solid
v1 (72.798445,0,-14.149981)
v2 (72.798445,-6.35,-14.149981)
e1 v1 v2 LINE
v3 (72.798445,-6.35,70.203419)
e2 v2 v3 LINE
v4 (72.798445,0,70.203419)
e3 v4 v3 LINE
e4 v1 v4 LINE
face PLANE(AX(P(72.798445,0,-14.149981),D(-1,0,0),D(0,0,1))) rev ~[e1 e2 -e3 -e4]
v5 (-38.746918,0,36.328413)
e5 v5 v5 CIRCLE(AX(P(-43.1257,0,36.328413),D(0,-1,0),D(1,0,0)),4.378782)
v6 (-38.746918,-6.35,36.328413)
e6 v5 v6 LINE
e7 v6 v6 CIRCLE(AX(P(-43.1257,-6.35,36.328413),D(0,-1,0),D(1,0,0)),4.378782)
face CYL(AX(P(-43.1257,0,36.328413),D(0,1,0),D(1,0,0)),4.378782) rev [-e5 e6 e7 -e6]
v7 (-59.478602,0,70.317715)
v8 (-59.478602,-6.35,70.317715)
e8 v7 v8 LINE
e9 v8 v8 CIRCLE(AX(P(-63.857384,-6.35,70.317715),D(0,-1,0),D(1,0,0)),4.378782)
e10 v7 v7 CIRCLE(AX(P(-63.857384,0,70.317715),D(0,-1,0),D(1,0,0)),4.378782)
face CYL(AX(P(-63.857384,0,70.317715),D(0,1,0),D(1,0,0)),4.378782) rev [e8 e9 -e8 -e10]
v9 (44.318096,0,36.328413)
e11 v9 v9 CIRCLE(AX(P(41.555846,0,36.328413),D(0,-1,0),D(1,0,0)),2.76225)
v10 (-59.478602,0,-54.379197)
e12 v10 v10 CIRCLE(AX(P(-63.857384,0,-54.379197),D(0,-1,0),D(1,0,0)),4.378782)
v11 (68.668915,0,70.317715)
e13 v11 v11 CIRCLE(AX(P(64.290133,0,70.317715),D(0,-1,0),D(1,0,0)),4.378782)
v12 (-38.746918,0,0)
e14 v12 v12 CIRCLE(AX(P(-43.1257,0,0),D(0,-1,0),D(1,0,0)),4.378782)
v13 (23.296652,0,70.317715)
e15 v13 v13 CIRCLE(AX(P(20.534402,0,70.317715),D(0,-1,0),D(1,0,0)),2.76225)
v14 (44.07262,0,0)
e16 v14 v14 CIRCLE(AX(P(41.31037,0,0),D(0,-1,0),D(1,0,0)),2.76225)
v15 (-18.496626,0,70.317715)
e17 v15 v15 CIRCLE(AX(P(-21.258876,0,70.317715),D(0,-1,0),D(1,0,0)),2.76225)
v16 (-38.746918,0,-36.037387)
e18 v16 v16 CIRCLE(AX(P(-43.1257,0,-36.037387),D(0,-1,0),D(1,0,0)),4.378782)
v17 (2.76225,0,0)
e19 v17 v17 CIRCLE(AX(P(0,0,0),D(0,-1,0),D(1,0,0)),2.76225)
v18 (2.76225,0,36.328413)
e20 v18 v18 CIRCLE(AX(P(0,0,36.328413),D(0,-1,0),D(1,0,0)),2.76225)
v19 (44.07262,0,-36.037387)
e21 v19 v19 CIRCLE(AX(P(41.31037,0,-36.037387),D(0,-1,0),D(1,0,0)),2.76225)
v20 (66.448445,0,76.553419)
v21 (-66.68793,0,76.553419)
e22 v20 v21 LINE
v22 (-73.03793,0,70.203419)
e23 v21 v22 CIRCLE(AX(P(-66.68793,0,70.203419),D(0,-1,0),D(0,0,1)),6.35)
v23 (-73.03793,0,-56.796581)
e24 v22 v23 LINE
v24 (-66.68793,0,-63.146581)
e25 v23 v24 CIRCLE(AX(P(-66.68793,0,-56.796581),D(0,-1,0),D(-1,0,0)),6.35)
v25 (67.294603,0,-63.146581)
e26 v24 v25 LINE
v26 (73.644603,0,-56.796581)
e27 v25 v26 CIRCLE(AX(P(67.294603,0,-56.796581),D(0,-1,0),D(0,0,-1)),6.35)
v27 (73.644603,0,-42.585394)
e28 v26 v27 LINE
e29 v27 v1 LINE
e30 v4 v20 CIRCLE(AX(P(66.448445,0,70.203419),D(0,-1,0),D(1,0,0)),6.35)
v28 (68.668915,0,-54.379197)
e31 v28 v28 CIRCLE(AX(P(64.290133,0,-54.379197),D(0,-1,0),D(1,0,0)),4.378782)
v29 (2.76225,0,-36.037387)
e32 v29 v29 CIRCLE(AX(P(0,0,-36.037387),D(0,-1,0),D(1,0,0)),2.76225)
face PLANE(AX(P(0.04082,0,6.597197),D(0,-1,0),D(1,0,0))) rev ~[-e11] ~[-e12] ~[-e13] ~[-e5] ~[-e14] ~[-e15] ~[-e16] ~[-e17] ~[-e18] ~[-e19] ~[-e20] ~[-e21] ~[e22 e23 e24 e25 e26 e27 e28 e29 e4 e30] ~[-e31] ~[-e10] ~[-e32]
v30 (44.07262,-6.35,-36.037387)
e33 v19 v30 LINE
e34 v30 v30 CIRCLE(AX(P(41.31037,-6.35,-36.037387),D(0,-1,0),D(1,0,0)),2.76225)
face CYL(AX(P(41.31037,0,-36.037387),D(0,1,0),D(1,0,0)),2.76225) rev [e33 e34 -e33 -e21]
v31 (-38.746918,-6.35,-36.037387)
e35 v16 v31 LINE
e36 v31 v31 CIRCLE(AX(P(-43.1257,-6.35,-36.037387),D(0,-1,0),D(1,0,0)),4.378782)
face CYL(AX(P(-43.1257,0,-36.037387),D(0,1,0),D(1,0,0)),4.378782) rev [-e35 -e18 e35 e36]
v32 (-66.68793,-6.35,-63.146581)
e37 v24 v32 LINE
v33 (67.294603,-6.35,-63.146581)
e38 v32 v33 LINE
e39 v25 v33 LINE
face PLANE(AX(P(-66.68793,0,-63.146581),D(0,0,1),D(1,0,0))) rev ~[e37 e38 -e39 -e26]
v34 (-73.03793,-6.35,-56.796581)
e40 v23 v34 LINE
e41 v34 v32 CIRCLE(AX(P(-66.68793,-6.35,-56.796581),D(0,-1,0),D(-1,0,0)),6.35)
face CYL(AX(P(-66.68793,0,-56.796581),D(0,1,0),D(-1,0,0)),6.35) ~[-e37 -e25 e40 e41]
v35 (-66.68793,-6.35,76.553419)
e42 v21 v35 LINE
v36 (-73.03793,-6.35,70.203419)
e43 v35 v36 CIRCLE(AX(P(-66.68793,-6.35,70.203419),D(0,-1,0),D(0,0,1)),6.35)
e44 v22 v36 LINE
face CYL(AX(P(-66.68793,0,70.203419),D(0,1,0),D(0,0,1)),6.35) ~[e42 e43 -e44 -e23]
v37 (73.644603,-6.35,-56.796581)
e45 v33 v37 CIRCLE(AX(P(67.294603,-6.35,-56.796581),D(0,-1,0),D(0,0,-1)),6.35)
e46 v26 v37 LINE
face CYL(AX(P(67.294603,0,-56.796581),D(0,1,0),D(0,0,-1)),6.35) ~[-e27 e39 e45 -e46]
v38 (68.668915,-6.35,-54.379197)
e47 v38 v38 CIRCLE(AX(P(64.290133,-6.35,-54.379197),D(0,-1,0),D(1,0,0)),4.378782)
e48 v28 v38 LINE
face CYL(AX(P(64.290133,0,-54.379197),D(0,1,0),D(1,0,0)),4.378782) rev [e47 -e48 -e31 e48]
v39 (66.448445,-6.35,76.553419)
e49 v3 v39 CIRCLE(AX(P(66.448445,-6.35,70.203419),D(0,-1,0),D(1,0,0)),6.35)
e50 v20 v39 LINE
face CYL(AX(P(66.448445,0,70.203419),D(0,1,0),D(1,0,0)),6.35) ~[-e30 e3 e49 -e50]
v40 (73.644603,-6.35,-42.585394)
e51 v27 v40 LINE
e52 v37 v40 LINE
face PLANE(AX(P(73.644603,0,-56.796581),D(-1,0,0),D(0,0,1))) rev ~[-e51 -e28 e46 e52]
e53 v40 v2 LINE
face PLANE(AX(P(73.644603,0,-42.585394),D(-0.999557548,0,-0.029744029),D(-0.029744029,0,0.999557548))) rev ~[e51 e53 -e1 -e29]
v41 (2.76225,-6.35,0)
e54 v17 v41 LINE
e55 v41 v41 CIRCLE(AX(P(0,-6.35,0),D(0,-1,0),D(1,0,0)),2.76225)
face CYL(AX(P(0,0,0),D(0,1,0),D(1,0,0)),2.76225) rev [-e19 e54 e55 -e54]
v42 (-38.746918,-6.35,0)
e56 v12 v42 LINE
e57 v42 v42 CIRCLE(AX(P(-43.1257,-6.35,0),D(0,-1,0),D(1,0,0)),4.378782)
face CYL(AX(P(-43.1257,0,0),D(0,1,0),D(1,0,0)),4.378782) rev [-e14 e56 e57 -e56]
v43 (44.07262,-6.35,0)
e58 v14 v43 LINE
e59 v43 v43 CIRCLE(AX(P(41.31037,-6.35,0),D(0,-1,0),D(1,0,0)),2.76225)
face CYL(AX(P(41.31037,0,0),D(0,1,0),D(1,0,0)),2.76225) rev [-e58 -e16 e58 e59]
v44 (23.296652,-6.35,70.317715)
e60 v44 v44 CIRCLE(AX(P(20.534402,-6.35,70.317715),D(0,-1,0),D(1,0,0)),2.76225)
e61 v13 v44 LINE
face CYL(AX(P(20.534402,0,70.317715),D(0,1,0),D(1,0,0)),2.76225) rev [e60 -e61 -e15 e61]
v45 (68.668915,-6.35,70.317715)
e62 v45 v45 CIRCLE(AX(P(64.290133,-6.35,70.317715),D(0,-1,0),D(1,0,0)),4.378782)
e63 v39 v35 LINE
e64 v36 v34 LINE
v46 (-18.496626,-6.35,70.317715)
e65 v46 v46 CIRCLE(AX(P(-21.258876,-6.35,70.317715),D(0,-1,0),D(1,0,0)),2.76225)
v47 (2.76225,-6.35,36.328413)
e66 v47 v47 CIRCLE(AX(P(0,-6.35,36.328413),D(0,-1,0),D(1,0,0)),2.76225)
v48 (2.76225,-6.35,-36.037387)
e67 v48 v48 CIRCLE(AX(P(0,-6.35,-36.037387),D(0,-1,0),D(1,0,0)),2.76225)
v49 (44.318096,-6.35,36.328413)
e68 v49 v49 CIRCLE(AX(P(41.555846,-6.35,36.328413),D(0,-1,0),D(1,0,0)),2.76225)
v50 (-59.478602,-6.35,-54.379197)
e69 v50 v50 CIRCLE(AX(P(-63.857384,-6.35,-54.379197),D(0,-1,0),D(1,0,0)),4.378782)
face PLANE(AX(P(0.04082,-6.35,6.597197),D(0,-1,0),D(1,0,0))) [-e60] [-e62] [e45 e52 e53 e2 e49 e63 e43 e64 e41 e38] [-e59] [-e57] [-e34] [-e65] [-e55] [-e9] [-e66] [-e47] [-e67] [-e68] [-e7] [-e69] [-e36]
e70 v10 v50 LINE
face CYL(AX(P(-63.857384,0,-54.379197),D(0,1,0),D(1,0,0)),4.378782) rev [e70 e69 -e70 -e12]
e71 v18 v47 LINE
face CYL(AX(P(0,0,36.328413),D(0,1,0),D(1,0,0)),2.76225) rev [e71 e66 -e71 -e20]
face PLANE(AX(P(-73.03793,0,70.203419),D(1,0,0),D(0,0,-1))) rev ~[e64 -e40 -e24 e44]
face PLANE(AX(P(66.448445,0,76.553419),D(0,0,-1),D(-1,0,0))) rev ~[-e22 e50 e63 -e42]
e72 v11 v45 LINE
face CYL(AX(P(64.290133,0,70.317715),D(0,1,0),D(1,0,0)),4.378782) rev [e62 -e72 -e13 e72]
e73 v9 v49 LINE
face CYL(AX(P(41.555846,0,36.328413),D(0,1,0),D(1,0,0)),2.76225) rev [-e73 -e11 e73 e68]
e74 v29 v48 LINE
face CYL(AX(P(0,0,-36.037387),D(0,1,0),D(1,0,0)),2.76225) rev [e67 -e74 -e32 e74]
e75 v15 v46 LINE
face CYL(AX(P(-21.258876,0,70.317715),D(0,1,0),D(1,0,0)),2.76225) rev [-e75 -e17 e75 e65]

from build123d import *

# Parameters (mm, degrees)
F0_R     = 4.3787819408
F0_R_2   = 2.76225
F1_DEPTH = 6.35


# Not quite as in the source:
# - a feature names something its author has since deleted; it is built from what else it names


with BuildPart() as f1:
    # F0 (on Front) → F1 (new body)
    with BuildSketch(Plane.XZ):
        with BuildLine():
            ThreePointArc((72.7984449517, 70.2034191426), (70.9385730123, 74.6935472031), (66.4484449517, 76.5534191426))
            Line((66.4484449517, 76.5534191426), (-66.6879298329, 76.5534191426))
            ThreePointArc((-66.6879298329, 76.5534191426), (-71.1780578935, 74.6935472031), (-73.0379298329, 70.2034191426))
            Line((-73.0379298329, 70.2034191426), (-73.0379298329, -14.1499808574))
            Line((-73.0379298329, -14.1499808574), (-73.0379298329, -42.5979808574))
            Line((-73.0379298329, -42.5979808574), (-73.0379298329, -56.7965808574))
            ThreePointArc((-73.0379298329, -56.7965808574), (-71.1780578935, -61.286708918), (-66.6879298329, -63.1465808574))
            Line((-66.6879298329, -63.1465808574), (67.2946030807, -63.1465808574))
            ThreePointArc((67.2946030807, -63.1465808574), (71.7847311412, -61.286708918), (73.6446030807, -56.7965808574))
            Line((73.6446030807, -56.7965808574), (73.6446030807, -42.5853939971))
            Line((73.6446030807, -42.5853939971), (72.7984449517, -14.1499808574))
            Line((72.7984449517, -14.1499808574), (72.7984449517, 70.2034191426))
        make_face()
        with Locations((-63.8573840261, -54.3791967528)):
            Circle(F0_R, mode=Mode.SUBTRACT)
        with Locations((-43.1257002056, -36.0373866536)):
            Circle(F0_R, mode=Mode.SUBTRACT)
        with Locations((0, -36.0373866536)):
            Circle(F0_R_2, mode=Mode.SUBTRACT)
        with Locations((-43.1257002056, 0)):
            Circle(F0_R, mode=Mode.SUBTRACT)
        Circle(F0_R_2, mode=Mode.SUBTRACT)
        with Locations((64.2901332332, -54.3791967528)):
            Circle(F0_R, mode=Mode.SUBTRACT)
        with Locations((41.3103699684, -36.0373866536)):
            Circle(F0_R_2, mode=Mode.SUBTRACT)
        with Locations((41.3103699684, 0)):
            Circle(F0_R_2, mode=Mode.SUBTRACT)
        with Locations((-43.1257002056, 36.3284125924)):
            Circle(F0_R, mode=Mode.SUBTRACT)
        with Locations((0, 36.3284125924)):
            Circle(F0_R_2, mode=Mode.SUBTRACT)
        with Locations((-63.8573840261, 70.3177154064)):
            Circle(F0_R, mode=Mode.SUBTRACT)
        with Locations((-21.2588757277, 70.3177154064)):
            Circle(F0_R_2, mode=Mode.SUBTRACT)
        with Locations((41.5558456844, 36.3284125924)):
            Circle(F0_R_2, mode=Mode.SUBTRACT)
        with Locations((20.5344017595, 70.3177154064)):
            Circle(F0_R_2, mode=Mode.SUBTRACT)
        with Locations((64.2901332332, 70.3177154064)):
            Circle(F0_R, mode=Mode.SUBTRACT)
    extrude(amount=F1_DEPTH)


solid = f1.part
